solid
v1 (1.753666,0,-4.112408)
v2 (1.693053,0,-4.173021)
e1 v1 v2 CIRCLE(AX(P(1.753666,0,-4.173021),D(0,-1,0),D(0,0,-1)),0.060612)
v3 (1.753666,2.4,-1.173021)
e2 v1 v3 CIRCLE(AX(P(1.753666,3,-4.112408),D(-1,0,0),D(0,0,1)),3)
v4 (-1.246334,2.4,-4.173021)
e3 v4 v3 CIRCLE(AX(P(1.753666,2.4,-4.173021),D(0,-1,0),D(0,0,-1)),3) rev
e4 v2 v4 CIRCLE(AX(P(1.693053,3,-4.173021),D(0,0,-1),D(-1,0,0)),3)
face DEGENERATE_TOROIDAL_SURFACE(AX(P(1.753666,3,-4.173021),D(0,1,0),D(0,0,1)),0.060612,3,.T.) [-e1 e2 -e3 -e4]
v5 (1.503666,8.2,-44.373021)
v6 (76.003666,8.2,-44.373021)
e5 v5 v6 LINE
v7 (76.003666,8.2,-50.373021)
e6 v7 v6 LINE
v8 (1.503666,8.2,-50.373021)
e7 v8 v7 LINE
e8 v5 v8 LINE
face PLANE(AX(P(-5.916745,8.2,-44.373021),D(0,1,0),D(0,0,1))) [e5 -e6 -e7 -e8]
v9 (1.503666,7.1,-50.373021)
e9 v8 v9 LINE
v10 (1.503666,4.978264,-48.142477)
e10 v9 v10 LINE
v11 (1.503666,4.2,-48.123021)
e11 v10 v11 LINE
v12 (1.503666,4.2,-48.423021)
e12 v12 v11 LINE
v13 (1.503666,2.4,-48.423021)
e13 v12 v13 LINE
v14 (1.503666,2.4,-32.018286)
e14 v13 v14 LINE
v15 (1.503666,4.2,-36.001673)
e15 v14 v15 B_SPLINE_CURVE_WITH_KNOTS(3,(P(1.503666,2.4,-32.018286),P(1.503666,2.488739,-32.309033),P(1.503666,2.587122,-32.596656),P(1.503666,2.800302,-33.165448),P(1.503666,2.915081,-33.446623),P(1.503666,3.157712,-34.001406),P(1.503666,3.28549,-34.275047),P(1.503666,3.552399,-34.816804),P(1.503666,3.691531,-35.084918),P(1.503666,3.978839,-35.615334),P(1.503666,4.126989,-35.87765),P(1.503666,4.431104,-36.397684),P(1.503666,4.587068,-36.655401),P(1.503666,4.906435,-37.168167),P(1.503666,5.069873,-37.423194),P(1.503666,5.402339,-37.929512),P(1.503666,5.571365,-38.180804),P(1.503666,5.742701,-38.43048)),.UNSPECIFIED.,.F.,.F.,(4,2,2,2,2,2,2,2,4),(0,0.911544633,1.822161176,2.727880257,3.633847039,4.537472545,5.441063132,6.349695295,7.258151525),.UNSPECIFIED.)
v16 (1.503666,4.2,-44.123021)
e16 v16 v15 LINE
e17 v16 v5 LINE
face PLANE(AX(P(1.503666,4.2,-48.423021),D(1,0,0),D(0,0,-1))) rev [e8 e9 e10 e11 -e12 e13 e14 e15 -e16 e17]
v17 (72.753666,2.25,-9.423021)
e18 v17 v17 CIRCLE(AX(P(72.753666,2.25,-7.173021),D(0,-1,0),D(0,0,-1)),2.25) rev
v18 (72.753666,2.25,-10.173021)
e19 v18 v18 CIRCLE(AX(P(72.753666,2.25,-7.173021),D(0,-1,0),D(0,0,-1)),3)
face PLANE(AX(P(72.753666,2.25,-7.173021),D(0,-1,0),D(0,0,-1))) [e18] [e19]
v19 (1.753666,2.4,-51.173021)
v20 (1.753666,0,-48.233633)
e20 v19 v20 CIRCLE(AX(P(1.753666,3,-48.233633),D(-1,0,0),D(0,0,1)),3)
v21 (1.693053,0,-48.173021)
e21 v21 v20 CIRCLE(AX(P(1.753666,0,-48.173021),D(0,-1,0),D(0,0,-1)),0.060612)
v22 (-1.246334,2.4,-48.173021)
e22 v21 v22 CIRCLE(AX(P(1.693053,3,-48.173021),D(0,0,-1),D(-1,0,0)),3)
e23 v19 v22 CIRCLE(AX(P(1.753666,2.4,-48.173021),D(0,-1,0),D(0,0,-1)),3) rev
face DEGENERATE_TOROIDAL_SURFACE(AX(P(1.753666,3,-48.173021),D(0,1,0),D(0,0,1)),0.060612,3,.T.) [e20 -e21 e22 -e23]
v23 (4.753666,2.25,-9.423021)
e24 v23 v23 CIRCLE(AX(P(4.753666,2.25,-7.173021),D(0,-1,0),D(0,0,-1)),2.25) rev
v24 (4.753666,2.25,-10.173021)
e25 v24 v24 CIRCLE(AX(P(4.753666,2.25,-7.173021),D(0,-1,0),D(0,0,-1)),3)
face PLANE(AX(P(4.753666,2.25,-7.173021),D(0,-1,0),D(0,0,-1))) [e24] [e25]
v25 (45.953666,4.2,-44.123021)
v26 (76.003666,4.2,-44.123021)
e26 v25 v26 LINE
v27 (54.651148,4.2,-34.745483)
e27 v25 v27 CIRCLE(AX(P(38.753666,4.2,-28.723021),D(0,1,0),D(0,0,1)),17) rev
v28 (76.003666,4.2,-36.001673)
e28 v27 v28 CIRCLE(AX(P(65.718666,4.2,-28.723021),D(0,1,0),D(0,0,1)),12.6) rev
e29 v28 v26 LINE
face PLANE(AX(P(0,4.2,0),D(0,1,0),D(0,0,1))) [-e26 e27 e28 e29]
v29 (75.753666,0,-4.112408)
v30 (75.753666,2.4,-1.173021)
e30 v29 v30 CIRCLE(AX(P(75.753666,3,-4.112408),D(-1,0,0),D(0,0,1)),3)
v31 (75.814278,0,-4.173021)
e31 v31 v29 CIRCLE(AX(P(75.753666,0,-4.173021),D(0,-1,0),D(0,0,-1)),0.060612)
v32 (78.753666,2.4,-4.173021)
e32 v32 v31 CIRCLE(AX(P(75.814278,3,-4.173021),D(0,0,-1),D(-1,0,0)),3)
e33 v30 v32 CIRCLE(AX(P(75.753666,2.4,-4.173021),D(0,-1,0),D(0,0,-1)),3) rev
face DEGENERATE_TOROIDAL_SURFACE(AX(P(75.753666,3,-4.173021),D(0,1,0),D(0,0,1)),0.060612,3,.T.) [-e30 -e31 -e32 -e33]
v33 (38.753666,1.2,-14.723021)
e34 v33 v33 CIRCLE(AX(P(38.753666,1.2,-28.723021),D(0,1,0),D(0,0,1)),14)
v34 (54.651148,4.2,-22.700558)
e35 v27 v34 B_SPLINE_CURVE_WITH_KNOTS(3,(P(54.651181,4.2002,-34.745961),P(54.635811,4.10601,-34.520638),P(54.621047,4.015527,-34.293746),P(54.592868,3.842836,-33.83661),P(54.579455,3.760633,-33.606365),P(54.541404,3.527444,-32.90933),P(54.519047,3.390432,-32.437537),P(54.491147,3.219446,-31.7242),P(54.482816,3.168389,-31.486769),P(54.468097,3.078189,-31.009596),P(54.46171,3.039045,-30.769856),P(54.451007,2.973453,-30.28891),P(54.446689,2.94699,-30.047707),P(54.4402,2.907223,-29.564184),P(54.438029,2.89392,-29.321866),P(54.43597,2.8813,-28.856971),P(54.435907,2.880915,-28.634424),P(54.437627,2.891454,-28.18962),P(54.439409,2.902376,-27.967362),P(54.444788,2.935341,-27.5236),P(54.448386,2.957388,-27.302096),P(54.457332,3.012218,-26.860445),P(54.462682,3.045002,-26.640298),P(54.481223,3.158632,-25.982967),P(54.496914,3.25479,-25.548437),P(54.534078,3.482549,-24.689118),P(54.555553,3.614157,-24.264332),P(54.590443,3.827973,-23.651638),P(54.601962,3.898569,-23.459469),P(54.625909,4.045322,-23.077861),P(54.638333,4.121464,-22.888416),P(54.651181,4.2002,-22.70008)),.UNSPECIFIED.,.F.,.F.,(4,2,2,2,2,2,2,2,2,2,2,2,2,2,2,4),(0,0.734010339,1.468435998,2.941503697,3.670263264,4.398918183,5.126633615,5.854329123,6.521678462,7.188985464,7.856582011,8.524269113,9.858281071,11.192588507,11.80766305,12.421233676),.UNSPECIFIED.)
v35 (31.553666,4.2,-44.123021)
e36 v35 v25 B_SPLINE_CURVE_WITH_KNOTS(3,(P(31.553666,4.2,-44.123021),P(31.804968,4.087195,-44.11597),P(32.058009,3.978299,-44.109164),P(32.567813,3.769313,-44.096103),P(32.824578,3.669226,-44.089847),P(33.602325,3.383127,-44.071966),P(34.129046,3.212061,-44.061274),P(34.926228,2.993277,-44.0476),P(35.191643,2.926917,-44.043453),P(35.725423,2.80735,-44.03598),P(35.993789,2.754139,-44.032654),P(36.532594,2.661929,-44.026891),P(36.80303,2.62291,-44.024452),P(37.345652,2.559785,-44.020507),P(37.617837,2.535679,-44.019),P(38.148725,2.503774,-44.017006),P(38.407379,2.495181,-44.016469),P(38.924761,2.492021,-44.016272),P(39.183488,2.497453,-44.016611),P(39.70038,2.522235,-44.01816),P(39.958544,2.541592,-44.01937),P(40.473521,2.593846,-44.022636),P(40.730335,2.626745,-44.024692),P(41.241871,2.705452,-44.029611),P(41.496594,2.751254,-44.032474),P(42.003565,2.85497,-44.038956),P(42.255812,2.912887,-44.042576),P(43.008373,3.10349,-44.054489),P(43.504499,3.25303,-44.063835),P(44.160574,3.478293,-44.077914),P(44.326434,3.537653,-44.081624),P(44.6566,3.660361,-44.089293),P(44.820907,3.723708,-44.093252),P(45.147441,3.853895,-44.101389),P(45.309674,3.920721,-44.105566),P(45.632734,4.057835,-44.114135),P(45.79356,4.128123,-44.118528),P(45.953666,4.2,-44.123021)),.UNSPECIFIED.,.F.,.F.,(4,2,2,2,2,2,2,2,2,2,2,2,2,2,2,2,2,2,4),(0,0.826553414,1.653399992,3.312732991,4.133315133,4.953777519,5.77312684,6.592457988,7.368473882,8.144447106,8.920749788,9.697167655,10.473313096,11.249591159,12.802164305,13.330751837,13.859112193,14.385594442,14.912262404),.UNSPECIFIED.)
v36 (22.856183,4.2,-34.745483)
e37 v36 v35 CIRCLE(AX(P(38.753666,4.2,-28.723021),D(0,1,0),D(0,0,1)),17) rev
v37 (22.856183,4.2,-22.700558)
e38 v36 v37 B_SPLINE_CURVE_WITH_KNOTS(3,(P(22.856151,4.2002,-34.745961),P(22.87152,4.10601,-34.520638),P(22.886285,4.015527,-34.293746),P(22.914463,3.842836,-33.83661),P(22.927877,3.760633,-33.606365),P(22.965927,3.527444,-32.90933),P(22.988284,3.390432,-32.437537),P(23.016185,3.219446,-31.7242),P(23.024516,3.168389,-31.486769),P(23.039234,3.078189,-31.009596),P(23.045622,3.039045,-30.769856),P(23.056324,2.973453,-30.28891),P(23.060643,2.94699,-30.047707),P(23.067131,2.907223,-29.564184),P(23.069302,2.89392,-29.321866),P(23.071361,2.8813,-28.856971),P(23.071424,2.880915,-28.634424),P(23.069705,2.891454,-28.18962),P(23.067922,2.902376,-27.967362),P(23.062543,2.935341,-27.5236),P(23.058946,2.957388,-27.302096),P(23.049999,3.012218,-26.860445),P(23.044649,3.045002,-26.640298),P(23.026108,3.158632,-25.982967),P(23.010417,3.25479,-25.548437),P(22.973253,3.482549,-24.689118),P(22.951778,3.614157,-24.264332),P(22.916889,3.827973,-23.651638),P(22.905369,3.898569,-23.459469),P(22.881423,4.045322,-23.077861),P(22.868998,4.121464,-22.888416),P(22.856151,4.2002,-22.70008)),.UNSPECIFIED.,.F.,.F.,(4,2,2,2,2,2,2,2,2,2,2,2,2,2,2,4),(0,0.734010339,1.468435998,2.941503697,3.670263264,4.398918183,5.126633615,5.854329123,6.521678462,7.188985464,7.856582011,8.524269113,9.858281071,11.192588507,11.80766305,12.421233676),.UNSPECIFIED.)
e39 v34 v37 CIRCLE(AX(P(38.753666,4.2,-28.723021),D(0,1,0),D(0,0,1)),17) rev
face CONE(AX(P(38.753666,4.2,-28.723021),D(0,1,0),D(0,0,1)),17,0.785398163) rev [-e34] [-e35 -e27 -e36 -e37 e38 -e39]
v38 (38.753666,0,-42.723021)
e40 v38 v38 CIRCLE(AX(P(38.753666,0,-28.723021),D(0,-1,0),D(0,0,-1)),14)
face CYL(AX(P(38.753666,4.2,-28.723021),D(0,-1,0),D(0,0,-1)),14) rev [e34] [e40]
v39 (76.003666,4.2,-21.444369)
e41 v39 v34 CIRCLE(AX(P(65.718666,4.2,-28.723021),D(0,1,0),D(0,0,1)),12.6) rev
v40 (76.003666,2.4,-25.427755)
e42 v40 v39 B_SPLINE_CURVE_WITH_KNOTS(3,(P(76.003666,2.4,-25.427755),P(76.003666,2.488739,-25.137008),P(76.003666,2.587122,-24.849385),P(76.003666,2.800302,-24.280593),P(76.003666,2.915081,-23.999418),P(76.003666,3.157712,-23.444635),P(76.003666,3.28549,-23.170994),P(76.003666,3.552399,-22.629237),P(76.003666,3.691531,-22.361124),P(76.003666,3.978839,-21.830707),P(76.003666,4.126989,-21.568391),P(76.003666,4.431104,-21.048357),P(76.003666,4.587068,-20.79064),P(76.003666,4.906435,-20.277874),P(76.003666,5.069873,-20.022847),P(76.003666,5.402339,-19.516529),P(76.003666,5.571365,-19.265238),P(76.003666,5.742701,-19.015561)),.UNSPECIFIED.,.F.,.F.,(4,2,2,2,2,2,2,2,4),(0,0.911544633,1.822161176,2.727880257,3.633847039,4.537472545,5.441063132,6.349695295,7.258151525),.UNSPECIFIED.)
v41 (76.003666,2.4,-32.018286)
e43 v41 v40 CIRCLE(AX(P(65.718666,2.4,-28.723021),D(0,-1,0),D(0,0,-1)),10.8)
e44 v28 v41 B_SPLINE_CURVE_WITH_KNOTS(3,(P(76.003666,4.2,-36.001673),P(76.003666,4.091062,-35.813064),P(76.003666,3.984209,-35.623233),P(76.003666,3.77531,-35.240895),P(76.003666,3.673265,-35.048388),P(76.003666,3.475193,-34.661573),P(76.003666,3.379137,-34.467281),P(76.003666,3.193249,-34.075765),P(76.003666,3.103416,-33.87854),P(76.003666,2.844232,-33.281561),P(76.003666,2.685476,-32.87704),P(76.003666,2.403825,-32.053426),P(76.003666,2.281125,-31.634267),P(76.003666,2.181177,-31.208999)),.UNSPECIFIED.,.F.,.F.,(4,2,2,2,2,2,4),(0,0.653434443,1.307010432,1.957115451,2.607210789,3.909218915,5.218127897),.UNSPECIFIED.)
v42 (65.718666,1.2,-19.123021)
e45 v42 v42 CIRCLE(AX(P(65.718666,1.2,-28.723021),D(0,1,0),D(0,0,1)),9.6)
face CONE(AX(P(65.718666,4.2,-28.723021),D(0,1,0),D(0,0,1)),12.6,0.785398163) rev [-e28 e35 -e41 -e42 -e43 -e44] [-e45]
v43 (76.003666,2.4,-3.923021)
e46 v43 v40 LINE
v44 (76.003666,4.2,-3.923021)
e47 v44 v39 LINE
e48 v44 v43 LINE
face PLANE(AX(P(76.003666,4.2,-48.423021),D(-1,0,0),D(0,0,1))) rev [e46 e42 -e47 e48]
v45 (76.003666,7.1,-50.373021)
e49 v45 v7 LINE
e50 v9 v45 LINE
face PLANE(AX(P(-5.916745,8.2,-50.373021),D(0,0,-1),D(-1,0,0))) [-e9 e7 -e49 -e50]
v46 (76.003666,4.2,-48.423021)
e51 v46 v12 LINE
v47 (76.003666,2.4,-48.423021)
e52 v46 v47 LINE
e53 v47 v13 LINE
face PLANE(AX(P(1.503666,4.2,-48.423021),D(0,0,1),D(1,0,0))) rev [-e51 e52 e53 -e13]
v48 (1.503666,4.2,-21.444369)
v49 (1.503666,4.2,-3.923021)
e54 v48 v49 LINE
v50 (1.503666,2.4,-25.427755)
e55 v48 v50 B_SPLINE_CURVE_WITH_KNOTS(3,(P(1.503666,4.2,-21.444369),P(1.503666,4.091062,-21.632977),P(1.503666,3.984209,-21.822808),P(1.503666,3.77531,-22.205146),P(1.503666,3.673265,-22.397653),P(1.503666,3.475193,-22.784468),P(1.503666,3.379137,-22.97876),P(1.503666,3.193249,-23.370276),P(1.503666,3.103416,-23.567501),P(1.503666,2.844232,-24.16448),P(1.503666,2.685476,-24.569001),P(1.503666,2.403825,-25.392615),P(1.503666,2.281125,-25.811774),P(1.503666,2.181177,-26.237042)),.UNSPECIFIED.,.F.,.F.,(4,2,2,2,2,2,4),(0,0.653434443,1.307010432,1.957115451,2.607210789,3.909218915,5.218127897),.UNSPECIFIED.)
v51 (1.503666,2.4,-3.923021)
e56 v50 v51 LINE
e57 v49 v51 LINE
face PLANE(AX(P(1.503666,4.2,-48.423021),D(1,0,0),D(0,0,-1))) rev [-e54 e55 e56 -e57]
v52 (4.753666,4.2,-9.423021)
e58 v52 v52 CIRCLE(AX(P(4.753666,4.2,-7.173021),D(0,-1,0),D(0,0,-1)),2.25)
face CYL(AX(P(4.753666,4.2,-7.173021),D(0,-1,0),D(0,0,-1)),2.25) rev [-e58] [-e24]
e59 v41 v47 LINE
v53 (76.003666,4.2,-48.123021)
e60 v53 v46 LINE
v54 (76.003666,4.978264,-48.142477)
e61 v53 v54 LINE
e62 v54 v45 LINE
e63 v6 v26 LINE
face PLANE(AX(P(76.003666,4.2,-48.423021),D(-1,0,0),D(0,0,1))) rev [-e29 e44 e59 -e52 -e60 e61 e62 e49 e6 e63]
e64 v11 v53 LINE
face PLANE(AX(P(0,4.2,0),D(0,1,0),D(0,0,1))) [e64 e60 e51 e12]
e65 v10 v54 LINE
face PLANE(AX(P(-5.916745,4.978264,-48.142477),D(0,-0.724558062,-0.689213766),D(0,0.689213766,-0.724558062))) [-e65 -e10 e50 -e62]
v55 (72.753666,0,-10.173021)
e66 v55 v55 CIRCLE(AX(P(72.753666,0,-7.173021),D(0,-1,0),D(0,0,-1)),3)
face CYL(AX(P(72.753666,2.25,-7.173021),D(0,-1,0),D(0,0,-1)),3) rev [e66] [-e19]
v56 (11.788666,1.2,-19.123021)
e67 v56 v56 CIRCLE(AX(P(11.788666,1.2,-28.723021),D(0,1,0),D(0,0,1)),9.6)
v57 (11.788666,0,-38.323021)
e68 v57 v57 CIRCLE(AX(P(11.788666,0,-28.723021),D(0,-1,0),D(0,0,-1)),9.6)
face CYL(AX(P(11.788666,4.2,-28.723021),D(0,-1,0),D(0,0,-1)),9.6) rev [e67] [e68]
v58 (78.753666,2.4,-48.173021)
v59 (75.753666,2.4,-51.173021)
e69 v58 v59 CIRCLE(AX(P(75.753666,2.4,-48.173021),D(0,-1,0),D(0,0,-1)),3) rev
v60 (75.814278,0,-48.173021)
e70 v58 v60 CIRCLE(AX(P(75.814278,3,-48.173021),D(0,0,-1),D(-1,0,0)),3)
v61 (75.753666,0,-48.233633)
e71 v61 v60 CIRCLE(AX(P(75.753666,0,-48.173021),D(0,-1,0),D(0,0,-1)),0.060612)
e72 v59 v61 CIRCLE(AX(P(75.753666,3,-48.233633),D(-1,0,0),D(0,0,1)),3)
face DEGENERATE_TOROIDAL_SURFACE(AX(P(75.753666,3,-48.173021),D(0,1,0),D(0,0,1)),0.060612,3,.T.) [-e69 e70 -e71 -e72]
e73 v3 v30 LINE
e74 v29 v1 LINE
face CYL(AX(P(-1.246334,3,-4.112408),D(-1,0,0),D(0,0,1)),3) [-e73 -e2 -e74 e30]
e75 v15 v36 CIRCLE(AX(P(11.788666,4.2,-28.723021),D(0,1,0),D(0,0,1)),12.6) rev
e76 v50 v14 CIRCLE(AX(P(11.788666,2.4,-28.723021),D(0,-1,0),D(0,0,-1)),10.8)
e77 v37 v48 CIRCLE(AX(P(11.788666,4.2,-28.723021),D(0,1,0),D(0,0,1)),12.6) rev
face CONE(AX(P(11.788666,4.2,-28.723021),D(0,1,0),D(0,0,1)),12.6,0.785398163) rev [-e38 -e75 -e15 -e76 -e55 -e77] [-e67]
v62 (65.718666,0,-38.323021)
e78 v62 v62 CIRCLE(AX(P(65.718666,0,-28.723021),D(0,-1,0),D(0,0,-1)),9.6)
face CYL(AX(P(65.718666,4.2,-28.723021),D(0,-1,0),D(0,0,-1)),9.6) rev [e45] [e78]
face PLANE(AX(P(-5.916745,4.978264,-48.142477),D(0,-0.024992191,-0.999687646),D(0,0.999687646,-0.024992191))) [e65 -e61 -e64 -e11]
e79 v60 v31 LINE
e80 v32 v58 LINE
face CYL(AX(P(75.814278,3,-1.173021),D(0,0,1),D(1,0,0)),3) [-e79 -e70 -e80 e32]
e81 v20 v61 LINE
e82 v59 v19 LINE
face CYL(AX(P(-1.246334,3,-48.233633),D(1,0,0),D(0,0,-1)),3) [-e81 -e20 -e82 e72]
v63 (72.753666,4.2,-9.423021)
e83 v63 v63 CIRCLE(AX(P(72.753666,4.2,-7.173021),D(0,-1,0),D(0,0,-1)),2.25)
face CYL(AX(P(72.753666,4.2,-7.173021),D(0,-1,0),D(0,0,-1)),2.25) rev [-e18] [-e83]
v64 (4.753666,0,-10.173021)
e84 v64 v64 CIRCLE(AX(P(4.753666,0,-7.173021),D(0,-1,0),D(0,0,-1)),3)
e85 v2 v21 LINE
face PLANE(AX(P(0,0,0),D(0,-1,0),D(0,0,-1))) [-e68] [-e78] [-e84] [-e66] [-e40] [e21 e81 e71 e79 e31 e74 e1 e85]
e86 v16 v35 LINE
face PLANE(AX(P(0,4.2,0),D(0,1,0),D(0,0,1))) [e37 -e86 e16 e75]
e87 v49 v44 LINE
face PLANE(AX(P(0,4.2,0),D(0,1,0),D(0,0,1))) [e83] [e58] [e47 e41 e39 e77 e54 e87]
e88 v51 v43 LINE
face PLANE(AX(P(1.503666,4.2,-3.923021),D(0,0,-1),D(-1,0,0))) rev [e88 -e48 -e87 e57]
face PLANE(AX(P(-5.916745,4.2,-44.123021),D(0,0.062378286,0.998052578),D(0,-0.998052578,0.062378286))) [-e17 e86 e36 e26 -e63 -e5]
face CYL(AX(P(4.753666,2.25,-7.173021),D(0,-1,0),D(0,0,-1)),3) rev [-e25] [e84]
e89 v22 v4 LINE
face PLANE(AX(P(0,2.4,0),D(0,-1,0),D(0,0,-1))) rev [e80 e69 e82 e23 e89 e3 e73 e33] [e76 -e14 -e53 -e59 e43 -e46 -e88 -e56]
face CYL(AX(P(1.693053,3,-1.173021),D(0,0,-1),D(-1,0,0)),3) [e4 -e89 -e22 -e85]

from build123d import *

# Parameters (mm, degrees)
SKETCH1_W           = 80
SKETCH1_H           = 50
BOSS_EXTRUDE1_DEPTH = 2.4
SKETCH2_W           = 74.5
SKETCH2_H           = 44.5
BOSS_EXTRUDE2_DEPTH = 1.8
SKETCH4_R           = 9.6
SKETCH4_R_2         = 14
SKETCH4_R_3         = 2.25
CUT_EXTRUDE1_DEPTH  = 95.013072971
BOSS_EXTRUDE3_DEPTH = 74.5
FILLET1_R           = 3
FILLET2_R           = 3
SKETCH7_R           = 3
CUT_EXTRUDE3_DEPTH  = 2.25
CHAMFER1_SIZE       = 3


with BuildPart() as part:
    # Sketch1 → Boss-Extrude1 (new body)
    with BuildSketch(Plane(origin=(0, 0, 0), x_dir=(1, 0, 0), z_dir=(0, 1, 0))):
        with Locations((38.753665689, 26.173020528)):
            Rectangle(SKETCH1_W, SKETCH1_H)
    extrude(amount=BOSS_EXTRUDE1_DEPTH)

    # Sketch2 → Boss-Extrude2 (add)
    with BuildSketch(Plane(origin=(0, 2.4, 0), x_dir=(1, 0, 0), z_dir=(0, 1, 0))):
        with Locations((38.753665689, 26.173020528)):
            Rectangle(SKETCH2_W, SKETCH2_H)
    extrude(amount=BOSS_EXTRUDE2_DEPTH)

    # Sketch4 → Cut-Extrude1 (cut, through all)
    with BuildSketch(Plane(origin=(0, 0, 0), x_dir=(-1, 0, 0), z_dir=(0, -1, 0))):
        with Locations(Location((-65.718665689, 28.723020528, 0), (0, 0, 90))):
            Circle(SKETCH4_R)
        with Locations(Location((-38.753665689, 28.723020528, 0), (0, 0, 90))):
            Circle(SKETCH4_R_2)
        with Locations(Location((-11.788665689, 28.723020528, 0), (0, 0, 90))):
            Circle(SKETCH4_R)
        with Locations(Location((-72.753665689, 7.173020528, 0), (0, 0, 90))):
            Circle(SKETCH4_R_3)
        with Locations(Location((-4.753665689, 7.173020528, 0), (0, 0, 90))):
            Circle(SKETCH4_R_3)
    extrude(amount=-CUT_EXTRUDE1_DEPTH, mode=Mode.SUBTRACT)

    # Sketch5 → Boss-Extrude3 (add)
    with BuildSketch(Plane(origin=(76.003665689, 0, 0), x_dir=(0, 0, -1), z_dir=(1, 0, 0))):
        Polygon((48.123020528, 4.2), (44.123020528, 4.2), (44.373020528, 8.2), (50.373020528, 8.2), (50.373020528, 7.1), (48.142477117, 4.978263585), align=None)
    extrude(amount=-BOSS_EXTRUDE3_DEPTH)

    # Fillet1
    fillet1_edges = [part.edges().sort_by_distance(p)[0] for p in [
        (-1.246334311, 1.2, -51.173020528),
        (78.753665689, 1.2, -51.173020528),
        (78.753665689, 1.2, -1.173020528),
        (-1.246334311, 1.2, -1.173020528),
    ]]
    fillet(fillet1_edges, radius=FILLET1_R)

    # Fillet2
    # the kernel refuses this fillet: 3 mm, written as the material it takes off along each edge
    with BuildSketch(Plane(origin=(1.753665689, 0, -48.173020528), x_dir=(-1, 0, 0), z_dir=(0, 0, 1))) as fillet2_piece_1:
        with BuildLine():
            CenterArc((0.060612309, -3), FILLET2_R, 11.536959033, 78.463040967)
            Line((3, -2.4), (3.058787754, -2.388))
            ThreePointArc((3.058787754, -2.388), (3.06, -1.2), (3.06, 0))
            Line((3.06, 0), (3, 0.06))
            Line((3, 0.06), (0.060612309, 0.06))
            Line((0.060612309, 0.06), (0.060612309, 0))
        make_face()
    revolve(axis=Axis((1.753665689, 0, -48.173020528), (0, -1, 0)), revolution_arc=90, mode=Mode.SUBTRACT)
    with BuildSketch(Plane(origin=(75.753665689, 0, -51.173020528), x_dir=(0, 0, 1), z_dir=(-1, 0, 0))) as fillet2_piece_2:
        with BuildLine():
            CenterArc((2.939387691, 3), FILLET2_R, 191.536959033, 78.463040967)
            Line((0, 2.4), (-0.058787754, 2.388))
            ThreePointArc((-0.058787754, 2.388), (-0.06, 1.2), (-0.06, 0))
            Line((-0.06, 0), (0, -0.06))
            Line((0, -0.06), (2.939387691, -0.06))
            Line((2.939387691, -0.06), (2.939387691, 0))
        make_face()
    extrude(amount=74, mode=Mode.SUBTRACT)
    with BuildSketch(Plane(origin=(75.753665689, 0, -48.173020528), x_dir=(1, 0, 0), z_dir=(0, 0, 1))) as fillet2_piece_3:
        with BuildLine():
            CenterArc((0.060612309, 3), FILLET2_R, 270, 78.463040967)
            Line((3, 2.4), (3.058787754, 2.388))
            ThreePointArc((3.058787754, 2.388), (3.06, 1.2), (3.06, 0))
            Line((3.06, 0), (3, -0.06))
            Line((3, -0.06), (0.060612309, -0.06))
            Line((0.060612309, -0.06), (0.060612309, 0))
        make_face()
    revolve(axis=Axis((75.753665689, 0, -48.173020528), (0, 1, 0)), revolution_arc=90, mode=Mode.SUBTRACT)
    with BuildSketch(Plane(origin=(78.753665689, 0, -4.173020528), x_dir=(-1, 0, 0), z_dir=(0, 0, -1)), Plane(origin=(-1.246334311, 0, -48.173020528), x_dir=(1, 0, 0), z_dir=(0, 0, 1))) as fillet2_piece_4:
        with BuildLine():
            CenterArc((2.939387691, 3), FILLET2_R, 191.536959033, 78.463040967)
            Line((0, 2.4), (-0.058787754, 2.388))
            ThreePointArc((-0.058787754, 2.388), (-0.06, 1.2), (-0.06, 0))
            Line((-0.06, 0), (0, -0.06))
            Line((0, -0.06), (2.939387691, -0.06))
            Line((2.939387691, -0.06), (2.939387691, 0))
        make_face()
    extrude(amount=44, mode=Mode.SUBTRACT)
    with BuildSketch(Plane(origin=(75.753665689, 0, -4.173020528), x_dir=(0, 0, 1), z_dir=(-1, 0, 0))) as fillet2_piece_5:
        with BuildLine():
            CenterArc((0.060612309, 3), FILLET2_R, 270, 78.463040967)
            Line((3, 2.4), (3.058787754, 2.388))
            ThreePointArc((3.058787754, 2.388), (3.06, 1.2), (3.06, 0))
            Line((3.06, 0), (3, -0.06))
            Line((3, -0.06), (0.060612309, -0.06))
            Line((0.060612309, -0.06), (0.060612309, 0))
        make_face()
    revolve(axis=Axis((75.753665689, 0, -4.173020528), (0, 1, 0)), revolution_arc=90, mode=Mode.SUBTRACT)
    with BuildSketch(Plane(origin=(1.753665689, 0, -1.173020528), x_dir=(0, 1.0, -1.5658770576478976e-12), z_dir=(1, 0, 0))) as fillet2_piece_6:
        with BuildLine():
            CenterArc((3, -2.939387691), FILLET2_R, 101.536959033, 78.463040967)
            Line((0, -2.939387691), (-0.06, -2.939387691))
            Line((-0.06, -2.939387691), (-0.06, 0))
            Line((-0.06, 0), (0, 0.06))
            ThreePointArc((0, 0.06), (1.2, 0.06), (2.388, 0.058787754))
            Line((2.388, 0.058787754), (2.4, 0))
        make_face()
    extrude(amount=74, mode=Mode.SUBTRACT)
    with BuildSketch(Plane(origin=(1.753665689, 0, -4.173020528), x_dir=(0, 0, 1), z_dir=(1, 0, 0))) as fillet2_piece_7:
        with BuildLine():
            CenterArc((0.060612309, -3), FILLET2_R, 11.536959033, 78.463040967)
            Line((3, -2.4), (3.058787754, -2.388))
            ThreePointArc((3.058787754, -2.388), (3.06, -1.2), (3.06, 0))
            Line((3.06, 0), (3, 0.06))
            Line((3, 0.06), (0.060612309, 0.06))
            Line((0.060612309, 0.06), (0.060612309, 0))
        make_face()
    revolve(axis=Axis((1.753665689, 0, -4.173020528), (0, -1, 0)), revolution_arc=90, mode=Mode.SUBTRACT)

    # Sketch7 → Cut-Extrude3 (cut)
    with BuildSketch(Plane.XZ):
        with Locations(Location((4.753665689, -7.173020528, 0), (0, 0, 270))):
            Circle(SKETCH7_R)
        with Locations(Location((72.753665689, -7.173020528, 0), (0, 0, 270))):
            Circle(SKETCH7_R)
    extrude(amount=-CUT_EXTRUDE3_DEPTH, mode=Mode.SUBTRACT)

    # Chamfer1
    # the kernel refuses this chamfer: 3 mm, written as the material it takes off along each edge
    with BuildSketch(Plane(origin=(11.788665689, 4.2, -28.723020528), x_dir=(0, 0, -1), z_dir=(-1, 0, 0))) as chamfer1_piece_1:
        Polygon((9.6 + CHAMFER1_SIZE, 0), (9.6, CHAMFER1_SIZE), (9.6, 0), align=None)
    revolve(axis=Axis((11.788665689, 4.2, -28.723020528), (0, -1, 0)), mode=Mode.SUBTRACT)
    with BuildSketch(Plane(origin=(38.753665689, 4.2, -28.723020528), x_dir=(0, 0, -1), z_dir=(-1, 0, 0))) as chamfer1_piece_2_section:
        Polygon((14 + CHAMFER1_SIZE, 0), (14, CHAMFER1_SIZE), (14, 0), align=None)
    chamfer1_piece_2 = revolve(axis=Axis((38.753665689, 4.2, -28.723020528), (0, -1, 0)), mode=Mode.PRIVATE)
    chamfer1_piece_2 = split(chamfer1_piece_2, bisect_by=Plane(origin=(38.753665689, 0.839630842, -43.912997455), z_dir=(0, 0.06237828615517877, 0.9980525784828888)), keep=Keep.TOP, mode=Mode.PRIVATE)
    add(chamfer1_piece_2, mode=Mode.SUBTRACT)
    with BuildSketch(Plane(origin=(65.718665689, 4.2, -28.723020528), x_dir=(0, 0, -1), z_dir=(-1, 0, 0))) as chamfer1_piece_3:
        Polygon((9.6 + CHAMFER1_SIZE, 0), (9.6, CHAMFER1_SIZE), (9.6, 0), align=None)
    revolve(axis=Axis((65.718665689, 4.2, -28.723020528), (0, -1, 0)), mode=Mode.SUBTRACT)


solid = part.part
